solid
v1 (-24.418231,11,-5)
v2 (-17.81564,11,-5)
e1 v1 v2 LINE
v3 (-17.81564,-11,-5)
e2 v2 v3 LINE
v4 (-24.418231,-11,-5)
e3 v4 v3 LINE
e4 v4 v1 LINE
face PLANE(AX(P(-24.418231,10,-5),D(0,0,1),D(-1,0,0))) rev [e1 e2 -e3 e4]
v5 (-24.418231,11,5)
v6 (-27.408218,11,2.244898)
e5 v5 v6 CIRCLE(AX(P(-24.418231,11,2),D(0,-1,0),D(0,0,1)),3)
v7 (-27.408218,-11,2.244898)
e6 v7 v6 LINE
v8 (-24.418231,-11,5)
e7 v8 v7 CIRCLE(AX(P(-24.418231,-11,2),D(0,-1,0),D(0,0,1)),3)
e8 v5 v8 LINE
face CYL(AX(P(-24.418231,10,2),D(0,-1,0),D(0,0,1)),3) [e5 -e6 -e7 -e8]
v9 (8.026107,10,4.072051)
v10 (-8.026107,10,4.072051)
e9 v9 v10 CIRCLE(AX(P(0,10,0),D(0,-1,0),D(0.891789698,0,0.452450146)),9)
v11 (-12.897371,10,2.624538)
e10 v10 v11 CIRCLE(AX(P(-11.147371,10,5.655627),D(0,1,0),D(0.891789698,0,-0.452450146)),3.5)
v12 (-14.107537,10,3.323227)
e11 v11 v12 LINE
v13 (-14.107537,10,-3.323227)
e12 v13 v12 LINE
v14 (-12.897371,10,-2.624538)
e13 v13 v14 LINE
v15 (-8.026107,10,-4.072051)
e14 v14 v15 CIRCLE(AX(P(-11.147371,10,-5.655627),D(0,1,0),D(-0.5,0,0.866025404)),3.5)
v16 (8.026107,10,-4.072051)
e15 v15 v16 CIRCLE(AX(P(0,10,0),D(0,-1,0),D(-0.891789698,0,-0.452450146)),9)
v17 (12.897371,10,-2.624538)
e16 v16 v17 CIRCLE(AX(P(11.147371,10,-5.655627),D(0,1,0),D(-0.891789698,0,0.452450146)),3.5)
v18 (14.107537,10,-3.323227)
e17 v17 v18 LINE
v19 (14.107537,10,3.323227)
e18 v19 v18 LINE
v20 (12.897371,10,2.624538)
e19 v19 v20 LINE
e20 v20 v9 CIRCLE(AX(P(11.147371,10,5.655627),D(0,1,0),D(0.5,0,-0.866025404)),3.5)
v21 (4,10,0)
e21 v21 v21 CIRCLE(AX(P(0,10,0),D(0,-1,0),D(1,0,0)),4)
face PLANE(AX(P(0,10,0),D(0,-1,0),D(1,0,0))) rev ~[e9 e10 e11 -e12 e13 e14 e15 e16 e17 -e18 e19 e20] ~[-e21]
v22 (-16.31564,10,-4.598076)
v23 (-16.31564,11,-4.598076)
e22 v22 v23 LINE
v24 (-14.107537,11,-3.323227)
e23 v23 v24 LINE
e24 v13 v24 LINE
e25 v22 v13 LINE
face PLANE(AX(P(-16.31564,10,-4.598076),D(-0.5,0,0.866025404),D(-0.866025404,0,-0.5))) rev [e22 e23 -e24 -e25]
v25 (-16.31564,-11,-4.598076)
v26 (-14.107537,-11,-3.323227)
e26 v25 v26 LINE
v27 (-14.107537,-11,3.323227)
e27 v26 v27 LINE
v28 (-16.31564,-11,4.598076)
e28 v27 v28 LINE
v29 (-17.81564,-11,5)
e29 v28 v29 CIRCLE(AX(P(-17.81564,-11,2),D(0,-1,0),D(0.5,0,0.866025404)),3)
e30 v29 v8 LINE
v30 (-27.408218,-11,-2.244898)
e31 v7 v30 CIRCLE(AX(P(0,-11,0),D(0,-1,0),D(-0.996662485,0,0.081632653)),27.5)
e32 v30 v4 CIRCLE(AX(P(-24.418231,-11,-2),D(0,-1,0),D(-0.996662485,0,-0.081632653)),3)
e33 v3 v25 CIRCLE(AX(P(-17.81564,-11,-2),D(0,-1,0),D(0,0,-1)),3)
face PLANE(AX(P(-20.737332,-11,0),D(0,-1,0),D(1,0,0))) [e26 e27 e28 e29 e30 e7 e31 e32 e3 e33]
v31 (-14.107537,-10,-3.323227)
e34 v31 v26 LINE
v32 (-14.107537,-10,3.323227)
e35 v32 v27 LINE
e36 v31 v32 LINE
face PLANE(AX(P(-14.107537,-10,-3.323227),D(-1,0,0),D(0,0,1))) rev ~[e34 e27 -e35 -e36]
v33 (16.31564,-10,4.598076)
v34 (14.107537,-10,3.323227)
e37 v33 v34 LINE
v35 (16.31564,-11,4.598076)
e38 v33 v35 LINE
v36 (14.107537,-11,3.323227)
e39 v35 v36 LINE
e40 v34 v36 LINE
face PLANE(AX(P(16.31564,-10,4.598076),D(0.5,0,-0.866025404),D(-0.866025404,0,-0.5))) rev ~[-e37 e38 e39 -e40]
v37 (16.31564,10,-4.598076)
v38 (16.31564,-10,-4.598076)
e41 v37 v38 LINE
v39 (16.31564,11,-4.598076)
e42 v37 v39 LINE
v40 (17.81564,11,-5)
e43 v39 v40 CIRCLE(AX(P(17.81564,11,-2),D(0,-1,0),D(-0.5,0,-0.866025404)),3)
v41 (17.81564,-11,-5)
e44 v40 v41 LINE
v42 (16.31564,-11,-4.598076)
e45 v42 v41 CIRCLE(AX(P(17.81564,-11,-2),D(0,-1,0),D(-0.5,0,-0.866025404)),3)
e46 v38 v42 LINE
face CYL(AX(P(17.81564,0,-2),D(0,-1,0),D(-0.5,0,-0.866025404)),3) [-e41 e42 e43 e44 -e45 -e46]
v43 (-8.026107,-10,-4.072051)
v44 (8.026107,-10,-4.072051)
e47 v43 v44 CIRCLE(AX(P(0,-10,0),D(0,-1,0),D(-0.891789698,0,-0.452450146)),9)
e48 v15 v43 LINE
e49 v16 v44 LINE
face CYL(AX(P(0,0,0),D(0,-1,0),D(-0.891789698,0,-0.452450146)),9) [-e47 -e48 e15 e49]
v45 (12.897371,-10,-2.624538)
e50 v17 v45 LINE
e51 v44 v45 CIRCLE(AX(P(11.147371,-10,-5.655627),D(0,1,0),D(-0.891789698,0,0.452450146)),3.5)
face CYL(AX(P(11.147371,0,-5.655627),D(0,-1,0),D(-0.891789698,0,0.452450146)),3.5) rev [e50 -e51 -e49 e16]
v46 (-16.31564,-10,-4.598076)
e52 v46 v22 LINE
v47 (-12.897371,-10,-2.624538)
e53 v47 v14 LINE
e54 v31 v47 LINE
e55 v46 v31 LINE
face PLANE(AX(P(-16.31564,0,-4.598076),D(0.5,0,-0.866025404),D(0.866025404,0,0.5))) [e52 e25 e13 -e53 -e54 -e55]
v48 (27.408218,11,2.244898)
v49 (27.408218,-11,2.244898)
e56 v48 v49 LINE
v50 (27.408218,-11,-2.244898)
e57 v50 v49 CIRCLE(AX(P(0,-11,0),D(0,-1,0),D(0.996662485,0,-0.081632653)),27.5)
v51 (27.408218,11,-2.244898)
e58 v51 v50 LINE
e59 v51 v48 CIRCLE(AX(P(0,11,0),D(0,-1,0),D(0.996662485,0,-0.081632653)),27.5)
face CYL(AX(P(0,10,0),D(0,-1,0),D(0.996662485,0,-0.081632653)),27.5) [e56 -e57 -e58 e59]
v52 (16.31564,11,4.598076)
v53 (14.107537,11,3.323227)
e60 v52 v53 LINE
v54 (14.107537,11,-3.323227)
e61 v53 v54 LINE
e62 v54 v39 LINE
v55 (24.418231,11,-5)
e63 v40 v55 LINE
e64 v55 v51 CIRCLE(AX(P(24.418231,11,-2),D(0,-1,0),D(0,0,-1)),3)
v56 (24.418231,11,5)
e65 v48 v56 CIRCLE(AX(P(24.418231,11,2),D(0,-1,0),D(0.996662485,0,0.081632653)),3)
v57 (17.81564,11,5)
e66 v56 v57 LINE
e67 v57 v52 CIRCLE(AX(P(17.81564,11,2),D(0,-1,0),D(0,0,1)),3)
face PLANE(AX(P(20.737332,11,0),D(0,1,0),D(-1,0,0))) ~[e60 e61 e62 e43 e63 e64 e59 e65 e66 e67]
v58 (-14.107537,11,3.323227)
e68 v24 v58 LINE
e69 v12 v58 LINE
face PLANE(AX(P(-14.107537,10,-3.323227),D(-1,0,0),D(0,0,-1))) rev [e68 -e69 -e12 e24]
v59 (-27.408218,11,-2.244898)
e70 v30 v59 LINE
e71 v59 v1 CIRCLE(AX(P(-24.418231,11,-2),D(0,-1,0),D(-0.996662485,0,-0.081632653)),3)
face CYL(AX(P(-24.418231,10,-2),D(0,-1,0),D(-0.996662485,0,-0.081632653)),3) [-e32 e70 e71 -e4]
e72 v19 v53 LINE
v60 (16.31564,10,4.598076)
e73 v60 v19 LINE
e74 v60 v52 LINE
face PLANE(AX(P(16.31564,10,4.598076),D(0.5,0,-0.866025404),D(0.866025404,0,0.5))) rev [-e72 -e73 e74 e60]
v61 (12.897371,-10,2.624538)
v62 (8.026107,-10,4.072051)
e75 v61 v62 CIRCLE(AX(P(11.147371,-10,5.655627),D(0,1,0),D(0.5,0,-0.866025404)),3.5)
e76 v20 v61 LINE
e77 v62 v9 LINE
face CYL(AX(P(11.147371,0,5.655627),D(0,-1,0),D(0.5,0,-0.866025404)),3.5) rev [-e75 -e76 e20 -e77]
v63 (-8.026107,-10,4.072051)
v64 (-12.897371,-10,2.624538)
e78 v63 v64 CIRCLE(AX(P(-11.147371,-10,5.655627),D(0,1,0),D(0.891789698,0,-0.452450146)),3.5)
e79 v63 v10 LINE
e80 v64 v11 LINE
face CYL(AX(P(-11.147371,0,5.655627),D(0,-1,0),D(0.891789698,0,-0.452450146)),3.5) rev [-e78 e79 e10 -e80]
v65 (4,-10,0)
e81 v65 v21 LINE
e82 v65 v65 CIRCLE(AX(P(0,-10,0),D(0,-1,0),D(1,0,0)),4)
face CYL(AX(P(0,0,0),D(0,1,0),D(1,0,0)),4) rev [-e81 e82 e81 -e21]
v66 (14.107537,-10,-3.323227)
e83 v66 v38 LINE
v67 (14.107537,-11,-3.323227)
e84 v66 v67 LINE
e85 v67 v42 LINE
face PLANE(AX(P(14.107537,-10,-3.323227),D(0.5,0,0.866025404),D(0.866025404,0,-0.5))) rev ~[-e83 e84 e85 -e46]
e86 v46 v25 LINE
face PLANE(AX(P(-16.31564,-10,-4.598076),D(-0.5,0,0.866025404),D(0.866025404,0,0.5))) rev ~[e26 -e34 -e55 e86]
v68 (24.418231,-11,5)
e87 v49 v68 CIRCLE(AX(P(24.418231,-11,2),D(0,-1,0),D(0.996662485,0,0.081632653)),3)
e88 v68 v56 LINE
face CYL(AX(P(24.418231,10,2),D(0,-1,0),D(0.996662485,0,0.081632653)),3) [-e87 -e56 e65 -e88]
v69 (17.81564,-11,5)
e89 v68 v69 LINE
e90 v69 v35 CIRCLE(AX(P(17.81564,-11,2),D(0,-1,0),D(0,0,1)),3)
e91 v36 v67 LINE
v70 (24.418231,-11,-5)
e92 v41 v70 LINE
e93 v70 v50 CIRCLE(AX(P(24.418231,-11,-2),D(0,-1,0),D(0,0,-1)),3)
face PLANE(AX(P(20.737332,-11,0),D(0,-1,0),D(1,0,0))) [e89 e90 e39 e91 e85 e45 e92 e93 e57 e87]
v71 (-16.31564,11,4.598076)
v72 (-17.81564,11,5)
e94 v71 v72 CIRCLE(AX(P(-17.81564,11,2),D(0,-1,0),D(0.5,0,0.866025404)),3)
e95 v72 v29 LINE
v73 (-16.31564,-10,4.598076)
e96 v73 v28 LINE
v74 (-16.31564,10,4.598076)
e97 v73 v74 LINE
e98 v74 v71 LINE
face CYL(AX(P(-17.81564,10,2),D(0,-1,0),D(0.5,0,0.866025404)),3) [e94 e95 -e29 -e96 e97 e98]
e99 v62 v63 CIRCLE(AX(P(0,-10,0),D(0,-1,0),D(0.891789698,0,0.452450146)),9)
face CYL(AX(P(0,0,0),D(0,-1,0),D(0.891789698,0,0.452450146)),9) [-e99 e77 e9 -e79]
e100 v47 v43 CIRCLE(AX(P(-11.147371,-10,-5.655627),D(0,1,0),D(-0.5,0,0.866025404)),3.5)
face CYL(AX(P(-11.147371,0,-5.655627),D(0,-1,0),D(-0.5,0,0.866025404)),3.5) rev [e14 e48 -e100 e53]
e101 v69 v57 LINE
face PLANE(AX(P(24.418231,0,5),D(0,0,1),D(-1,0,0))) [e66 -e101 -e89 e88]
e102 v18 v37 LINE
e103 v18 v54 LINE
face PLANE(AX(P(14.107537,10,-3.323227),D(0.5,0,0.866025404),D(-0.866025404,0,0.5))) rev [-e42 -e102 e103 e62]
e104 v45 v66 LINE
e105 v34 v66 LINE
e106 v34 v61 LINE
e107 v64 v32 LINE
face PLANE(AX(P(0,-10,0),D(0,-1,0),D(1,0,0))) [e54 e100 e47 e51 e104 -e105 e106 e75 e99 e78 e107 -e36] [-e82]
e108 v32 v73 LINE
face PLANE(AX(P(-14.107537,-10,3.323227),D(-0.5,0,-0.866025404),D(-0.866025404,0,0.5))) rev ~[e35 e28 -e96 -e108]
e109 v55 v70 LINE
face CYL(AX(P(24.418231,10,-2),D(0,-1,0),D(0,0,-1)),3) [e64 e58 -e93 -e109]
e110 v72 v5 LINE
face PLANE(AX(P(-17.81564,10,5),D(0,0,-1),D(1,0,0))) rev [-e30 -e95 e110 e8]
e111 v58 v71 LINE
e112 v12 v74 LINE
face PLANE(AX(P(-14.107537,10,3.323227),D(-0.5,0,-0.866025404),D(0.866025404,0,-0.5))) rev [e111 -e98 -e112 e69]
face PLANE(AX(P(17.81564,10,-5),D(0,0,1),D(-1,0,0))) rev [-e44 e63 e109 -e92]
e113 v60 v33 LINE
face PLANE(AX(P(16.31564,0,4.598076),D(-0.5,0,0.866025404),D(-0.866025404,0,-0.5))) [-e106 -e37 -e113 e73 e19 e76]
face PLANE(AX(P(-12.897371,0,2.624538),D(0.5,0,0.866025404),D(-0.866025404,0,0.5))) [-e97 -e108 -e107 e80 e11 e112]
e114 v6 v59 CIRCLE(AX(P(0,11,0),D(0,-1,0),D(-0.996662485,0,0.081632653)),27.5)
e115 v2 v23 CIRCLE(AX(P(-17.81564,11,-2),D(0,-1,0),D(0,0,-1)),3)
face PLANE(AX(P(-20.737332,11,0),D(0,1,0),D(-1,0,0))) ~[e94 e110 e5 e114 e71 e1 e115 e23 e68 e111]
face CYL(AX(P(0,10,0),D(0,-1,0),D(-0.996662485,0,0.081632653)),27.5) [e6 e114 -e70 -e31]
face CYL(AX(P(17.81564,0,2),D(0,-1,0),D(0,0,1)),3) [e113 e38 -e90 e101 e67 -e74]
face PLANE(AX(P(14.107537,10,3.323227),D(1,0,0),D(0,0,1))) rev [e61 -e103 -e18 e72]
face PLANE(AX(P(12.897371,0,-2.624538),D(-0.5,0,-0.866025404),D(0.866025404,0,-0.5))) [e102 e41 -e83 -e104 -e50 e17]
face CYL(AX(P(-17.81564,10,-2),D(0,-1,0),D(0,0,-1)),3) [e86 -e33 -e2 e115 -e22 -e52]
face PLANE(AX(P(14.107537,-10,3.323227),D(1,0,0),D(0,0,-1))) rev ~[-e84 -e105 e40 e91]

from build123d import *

# Parameters (mm, degrees)
F0_R     = 4
F1_DEPTH = 10
F3_DEPTH = 1


# Not quite as in the source:
# - a pattern or mirror of a feature is missing from the dataset's text; its kind, count and spacing are read off the source's solid


with BuildPart() as f1:
    # F0 (on Front) → F1 (new body, symmetric)
    with BuildSketch(Plane.XZ):
        with BuildLine():
            ThreePointArc((-12.8973712231, -2.6245379145), (-10.1504183848, -2.3006178802), (-8.0261072806, -4.072051316))
            ThreePointArc((-8.0261072806, -4.072051316), (0, -9), (8.0261072806, -4.072051316))
            ThreePointArc((8.0261072806, -4.072051316), (10.1504183848, -2.3006178802), (12.8973712231, -2.6245379145))
            Line((12.8973712231, -2.6245379145), (16.315639824, -4.5980762114))
            ThreePointArc((16.315639824, -4.5980762114), (17.0391826887, -4.8977774789), (17.815639824, -5))
            Line((17.815639824, -5), (24.4182308941, -5))
            ThreePointArc((24.4182308941, -5), (26.4511236757, -4.2062064588), (27.4082183506, -2.2448979592))
            ThreePointArc((27.4082183506, -2.2448979592), (27.5, 0), (27.4082183506, 2.2448979592))
            ThreePointArc((27.4082183506, 2.2448979592), (26.4511236757, 4.2062064588), (24.4182308941, 5))
            Line((24.4182308941, 5), (17.815639824, 5))
            ThreePointArc((17.815639824, 5), (17.0391826887, 4.8977774789), (16.315639824, 4.5980762114))
            Line((16.315639824, 4.5980762114), (12.8973712231, 2.6245379145))
            ThreePointArc((12.8973712231, 2.6245379145), (10.1504183848, 2.3006178802), (8.0261072806, 4.072051316))
            ThreePointArc((8.0261072806, 4.072051316), (0, 9), (-8.0261072806, 4.072051316))
            ThreePointArc((-8.0261072806, 4.072051316), (-10.1504183848, 2.3006178802), (-12.8973712231, 2.6245379145))
            Line((-12.8973712231, 2.6245379145), (-16.315639824, 4.5980762114))
            ThreePointArc((-16.315639824, 4.5980762114), (-17.0391826887, 4.8977774789), (-17.815639824, 5))
            Line((-17.815639824, 5), (-24.4182308941, 5))
            ThreePointArc((-24.4182308941, 5), (-26.4511236757, 4.2062064588), (-27.4082183506, 2.2448979592))
            ThreePointArc((-27.4082183506, 2.2448979592), (-27.5, 0), (-27.4082183506, -2.2448979592))
            ThreePointArc((-27.4082183506, -2.2448979592), (-26.4511236757, -4.2062064588), (-24.4182308941, -5))
            Line((-24.4182308941, -5), (-17.815639824, -5))
            ThreePointArc((-17.815639824, -5), (-17.0391826887, -4.8977774789), (-16.315639824, -4.5980762114))
            Line((-16.315639824, -4.5980762114), (-12.8973712231, -2.6245379145))
        make_face()
        Circle(F0_R, mode=Mode.SUBTRACT)
    extrude(amount=F1_DEPTH, both=True)

    # F2 (on face) → F3 (join)
    with BuildSketch(Plane.XZ.offset(10)):
        with BuildLine():
            Line((-24.4182308941, -5), (-17.815639824, -5))
            ThreePointArc((-17.815639824, -5), (-17.0391826887, -4.8977774789), (-16.315639824, -4.5980762114))
            Line((-16.315639824, -4.5980762114), (-14.1075365245, -3.323227177))
            Line((-14.1075365245, -3.323227177), (-14.1075365245, 3.323227177))
            Line((-14.1075365245, 3.323227177), (-16.315639824, 4.5980762114))
            ThreePointArc((-16.315639824, 4.5980762114), (-17.0391826887, 4.8977774789), (-17.815639824, 5))
            Line((-17.815639824, 5), (-24.4182308941, 5))
            ThreePointArc((-24.4182308941, 5), (-26.4511236757, 4.2062064588), (-27.4082183506, 2.2448979592))
            ThreePointArc((-27.4082183506, 2.2448979592), (-27.5, 0), (-27.4082183506, -2.2448979592))
            ThreePointArc((-27.4082183506, -2.2448979592), (-26.4511236757, -4.2062064588), (-24.4182308941, -5))
        make_face()
        with BuildLine():
            Line((14.1075365245, -3.323227177), (16.315639824, -4.5980762114))
            ThreePointArc((16.315639824, -4.5980762114), (17.0391826887, -4.8977774789), (17.815639824, -5))
            Line((17.815639824, -5), (24.4182308941, -5))
            ThreePointArc((24.4182308941, -5), (26.4511236757, -4.2062064588), (27.4082183506, -2.2448979592))
            ThreePointArc((27.4082183506, -2.2448979592), (27.5, 0), (27.4082183506, 2.2448979592))
            ThreePointArc((27.4082183506, 2.2448979592), (26.4511236757, 4.2062064588), (24.4182308941, 5))
            Line((24.4182308941, 5), (17.815639824, 5))
            ThreePointArc((17.815639824, 5), (17.0391826887, 4.8977774789), (16.315639824, 4.5980762114))
            Line((16.315639824, 4.5980762114), (14.1075365245, 3.323227177))
            Line((14.1075365245, 3.323227177), (14.1075365245, -3.323227177))
        make_face()
    f3 = extrude(amount=F3_DEPTH)

    # F3_copies: F3 across plane
    add(f3.mirror(Plane.ZX))


solid = f1.part
